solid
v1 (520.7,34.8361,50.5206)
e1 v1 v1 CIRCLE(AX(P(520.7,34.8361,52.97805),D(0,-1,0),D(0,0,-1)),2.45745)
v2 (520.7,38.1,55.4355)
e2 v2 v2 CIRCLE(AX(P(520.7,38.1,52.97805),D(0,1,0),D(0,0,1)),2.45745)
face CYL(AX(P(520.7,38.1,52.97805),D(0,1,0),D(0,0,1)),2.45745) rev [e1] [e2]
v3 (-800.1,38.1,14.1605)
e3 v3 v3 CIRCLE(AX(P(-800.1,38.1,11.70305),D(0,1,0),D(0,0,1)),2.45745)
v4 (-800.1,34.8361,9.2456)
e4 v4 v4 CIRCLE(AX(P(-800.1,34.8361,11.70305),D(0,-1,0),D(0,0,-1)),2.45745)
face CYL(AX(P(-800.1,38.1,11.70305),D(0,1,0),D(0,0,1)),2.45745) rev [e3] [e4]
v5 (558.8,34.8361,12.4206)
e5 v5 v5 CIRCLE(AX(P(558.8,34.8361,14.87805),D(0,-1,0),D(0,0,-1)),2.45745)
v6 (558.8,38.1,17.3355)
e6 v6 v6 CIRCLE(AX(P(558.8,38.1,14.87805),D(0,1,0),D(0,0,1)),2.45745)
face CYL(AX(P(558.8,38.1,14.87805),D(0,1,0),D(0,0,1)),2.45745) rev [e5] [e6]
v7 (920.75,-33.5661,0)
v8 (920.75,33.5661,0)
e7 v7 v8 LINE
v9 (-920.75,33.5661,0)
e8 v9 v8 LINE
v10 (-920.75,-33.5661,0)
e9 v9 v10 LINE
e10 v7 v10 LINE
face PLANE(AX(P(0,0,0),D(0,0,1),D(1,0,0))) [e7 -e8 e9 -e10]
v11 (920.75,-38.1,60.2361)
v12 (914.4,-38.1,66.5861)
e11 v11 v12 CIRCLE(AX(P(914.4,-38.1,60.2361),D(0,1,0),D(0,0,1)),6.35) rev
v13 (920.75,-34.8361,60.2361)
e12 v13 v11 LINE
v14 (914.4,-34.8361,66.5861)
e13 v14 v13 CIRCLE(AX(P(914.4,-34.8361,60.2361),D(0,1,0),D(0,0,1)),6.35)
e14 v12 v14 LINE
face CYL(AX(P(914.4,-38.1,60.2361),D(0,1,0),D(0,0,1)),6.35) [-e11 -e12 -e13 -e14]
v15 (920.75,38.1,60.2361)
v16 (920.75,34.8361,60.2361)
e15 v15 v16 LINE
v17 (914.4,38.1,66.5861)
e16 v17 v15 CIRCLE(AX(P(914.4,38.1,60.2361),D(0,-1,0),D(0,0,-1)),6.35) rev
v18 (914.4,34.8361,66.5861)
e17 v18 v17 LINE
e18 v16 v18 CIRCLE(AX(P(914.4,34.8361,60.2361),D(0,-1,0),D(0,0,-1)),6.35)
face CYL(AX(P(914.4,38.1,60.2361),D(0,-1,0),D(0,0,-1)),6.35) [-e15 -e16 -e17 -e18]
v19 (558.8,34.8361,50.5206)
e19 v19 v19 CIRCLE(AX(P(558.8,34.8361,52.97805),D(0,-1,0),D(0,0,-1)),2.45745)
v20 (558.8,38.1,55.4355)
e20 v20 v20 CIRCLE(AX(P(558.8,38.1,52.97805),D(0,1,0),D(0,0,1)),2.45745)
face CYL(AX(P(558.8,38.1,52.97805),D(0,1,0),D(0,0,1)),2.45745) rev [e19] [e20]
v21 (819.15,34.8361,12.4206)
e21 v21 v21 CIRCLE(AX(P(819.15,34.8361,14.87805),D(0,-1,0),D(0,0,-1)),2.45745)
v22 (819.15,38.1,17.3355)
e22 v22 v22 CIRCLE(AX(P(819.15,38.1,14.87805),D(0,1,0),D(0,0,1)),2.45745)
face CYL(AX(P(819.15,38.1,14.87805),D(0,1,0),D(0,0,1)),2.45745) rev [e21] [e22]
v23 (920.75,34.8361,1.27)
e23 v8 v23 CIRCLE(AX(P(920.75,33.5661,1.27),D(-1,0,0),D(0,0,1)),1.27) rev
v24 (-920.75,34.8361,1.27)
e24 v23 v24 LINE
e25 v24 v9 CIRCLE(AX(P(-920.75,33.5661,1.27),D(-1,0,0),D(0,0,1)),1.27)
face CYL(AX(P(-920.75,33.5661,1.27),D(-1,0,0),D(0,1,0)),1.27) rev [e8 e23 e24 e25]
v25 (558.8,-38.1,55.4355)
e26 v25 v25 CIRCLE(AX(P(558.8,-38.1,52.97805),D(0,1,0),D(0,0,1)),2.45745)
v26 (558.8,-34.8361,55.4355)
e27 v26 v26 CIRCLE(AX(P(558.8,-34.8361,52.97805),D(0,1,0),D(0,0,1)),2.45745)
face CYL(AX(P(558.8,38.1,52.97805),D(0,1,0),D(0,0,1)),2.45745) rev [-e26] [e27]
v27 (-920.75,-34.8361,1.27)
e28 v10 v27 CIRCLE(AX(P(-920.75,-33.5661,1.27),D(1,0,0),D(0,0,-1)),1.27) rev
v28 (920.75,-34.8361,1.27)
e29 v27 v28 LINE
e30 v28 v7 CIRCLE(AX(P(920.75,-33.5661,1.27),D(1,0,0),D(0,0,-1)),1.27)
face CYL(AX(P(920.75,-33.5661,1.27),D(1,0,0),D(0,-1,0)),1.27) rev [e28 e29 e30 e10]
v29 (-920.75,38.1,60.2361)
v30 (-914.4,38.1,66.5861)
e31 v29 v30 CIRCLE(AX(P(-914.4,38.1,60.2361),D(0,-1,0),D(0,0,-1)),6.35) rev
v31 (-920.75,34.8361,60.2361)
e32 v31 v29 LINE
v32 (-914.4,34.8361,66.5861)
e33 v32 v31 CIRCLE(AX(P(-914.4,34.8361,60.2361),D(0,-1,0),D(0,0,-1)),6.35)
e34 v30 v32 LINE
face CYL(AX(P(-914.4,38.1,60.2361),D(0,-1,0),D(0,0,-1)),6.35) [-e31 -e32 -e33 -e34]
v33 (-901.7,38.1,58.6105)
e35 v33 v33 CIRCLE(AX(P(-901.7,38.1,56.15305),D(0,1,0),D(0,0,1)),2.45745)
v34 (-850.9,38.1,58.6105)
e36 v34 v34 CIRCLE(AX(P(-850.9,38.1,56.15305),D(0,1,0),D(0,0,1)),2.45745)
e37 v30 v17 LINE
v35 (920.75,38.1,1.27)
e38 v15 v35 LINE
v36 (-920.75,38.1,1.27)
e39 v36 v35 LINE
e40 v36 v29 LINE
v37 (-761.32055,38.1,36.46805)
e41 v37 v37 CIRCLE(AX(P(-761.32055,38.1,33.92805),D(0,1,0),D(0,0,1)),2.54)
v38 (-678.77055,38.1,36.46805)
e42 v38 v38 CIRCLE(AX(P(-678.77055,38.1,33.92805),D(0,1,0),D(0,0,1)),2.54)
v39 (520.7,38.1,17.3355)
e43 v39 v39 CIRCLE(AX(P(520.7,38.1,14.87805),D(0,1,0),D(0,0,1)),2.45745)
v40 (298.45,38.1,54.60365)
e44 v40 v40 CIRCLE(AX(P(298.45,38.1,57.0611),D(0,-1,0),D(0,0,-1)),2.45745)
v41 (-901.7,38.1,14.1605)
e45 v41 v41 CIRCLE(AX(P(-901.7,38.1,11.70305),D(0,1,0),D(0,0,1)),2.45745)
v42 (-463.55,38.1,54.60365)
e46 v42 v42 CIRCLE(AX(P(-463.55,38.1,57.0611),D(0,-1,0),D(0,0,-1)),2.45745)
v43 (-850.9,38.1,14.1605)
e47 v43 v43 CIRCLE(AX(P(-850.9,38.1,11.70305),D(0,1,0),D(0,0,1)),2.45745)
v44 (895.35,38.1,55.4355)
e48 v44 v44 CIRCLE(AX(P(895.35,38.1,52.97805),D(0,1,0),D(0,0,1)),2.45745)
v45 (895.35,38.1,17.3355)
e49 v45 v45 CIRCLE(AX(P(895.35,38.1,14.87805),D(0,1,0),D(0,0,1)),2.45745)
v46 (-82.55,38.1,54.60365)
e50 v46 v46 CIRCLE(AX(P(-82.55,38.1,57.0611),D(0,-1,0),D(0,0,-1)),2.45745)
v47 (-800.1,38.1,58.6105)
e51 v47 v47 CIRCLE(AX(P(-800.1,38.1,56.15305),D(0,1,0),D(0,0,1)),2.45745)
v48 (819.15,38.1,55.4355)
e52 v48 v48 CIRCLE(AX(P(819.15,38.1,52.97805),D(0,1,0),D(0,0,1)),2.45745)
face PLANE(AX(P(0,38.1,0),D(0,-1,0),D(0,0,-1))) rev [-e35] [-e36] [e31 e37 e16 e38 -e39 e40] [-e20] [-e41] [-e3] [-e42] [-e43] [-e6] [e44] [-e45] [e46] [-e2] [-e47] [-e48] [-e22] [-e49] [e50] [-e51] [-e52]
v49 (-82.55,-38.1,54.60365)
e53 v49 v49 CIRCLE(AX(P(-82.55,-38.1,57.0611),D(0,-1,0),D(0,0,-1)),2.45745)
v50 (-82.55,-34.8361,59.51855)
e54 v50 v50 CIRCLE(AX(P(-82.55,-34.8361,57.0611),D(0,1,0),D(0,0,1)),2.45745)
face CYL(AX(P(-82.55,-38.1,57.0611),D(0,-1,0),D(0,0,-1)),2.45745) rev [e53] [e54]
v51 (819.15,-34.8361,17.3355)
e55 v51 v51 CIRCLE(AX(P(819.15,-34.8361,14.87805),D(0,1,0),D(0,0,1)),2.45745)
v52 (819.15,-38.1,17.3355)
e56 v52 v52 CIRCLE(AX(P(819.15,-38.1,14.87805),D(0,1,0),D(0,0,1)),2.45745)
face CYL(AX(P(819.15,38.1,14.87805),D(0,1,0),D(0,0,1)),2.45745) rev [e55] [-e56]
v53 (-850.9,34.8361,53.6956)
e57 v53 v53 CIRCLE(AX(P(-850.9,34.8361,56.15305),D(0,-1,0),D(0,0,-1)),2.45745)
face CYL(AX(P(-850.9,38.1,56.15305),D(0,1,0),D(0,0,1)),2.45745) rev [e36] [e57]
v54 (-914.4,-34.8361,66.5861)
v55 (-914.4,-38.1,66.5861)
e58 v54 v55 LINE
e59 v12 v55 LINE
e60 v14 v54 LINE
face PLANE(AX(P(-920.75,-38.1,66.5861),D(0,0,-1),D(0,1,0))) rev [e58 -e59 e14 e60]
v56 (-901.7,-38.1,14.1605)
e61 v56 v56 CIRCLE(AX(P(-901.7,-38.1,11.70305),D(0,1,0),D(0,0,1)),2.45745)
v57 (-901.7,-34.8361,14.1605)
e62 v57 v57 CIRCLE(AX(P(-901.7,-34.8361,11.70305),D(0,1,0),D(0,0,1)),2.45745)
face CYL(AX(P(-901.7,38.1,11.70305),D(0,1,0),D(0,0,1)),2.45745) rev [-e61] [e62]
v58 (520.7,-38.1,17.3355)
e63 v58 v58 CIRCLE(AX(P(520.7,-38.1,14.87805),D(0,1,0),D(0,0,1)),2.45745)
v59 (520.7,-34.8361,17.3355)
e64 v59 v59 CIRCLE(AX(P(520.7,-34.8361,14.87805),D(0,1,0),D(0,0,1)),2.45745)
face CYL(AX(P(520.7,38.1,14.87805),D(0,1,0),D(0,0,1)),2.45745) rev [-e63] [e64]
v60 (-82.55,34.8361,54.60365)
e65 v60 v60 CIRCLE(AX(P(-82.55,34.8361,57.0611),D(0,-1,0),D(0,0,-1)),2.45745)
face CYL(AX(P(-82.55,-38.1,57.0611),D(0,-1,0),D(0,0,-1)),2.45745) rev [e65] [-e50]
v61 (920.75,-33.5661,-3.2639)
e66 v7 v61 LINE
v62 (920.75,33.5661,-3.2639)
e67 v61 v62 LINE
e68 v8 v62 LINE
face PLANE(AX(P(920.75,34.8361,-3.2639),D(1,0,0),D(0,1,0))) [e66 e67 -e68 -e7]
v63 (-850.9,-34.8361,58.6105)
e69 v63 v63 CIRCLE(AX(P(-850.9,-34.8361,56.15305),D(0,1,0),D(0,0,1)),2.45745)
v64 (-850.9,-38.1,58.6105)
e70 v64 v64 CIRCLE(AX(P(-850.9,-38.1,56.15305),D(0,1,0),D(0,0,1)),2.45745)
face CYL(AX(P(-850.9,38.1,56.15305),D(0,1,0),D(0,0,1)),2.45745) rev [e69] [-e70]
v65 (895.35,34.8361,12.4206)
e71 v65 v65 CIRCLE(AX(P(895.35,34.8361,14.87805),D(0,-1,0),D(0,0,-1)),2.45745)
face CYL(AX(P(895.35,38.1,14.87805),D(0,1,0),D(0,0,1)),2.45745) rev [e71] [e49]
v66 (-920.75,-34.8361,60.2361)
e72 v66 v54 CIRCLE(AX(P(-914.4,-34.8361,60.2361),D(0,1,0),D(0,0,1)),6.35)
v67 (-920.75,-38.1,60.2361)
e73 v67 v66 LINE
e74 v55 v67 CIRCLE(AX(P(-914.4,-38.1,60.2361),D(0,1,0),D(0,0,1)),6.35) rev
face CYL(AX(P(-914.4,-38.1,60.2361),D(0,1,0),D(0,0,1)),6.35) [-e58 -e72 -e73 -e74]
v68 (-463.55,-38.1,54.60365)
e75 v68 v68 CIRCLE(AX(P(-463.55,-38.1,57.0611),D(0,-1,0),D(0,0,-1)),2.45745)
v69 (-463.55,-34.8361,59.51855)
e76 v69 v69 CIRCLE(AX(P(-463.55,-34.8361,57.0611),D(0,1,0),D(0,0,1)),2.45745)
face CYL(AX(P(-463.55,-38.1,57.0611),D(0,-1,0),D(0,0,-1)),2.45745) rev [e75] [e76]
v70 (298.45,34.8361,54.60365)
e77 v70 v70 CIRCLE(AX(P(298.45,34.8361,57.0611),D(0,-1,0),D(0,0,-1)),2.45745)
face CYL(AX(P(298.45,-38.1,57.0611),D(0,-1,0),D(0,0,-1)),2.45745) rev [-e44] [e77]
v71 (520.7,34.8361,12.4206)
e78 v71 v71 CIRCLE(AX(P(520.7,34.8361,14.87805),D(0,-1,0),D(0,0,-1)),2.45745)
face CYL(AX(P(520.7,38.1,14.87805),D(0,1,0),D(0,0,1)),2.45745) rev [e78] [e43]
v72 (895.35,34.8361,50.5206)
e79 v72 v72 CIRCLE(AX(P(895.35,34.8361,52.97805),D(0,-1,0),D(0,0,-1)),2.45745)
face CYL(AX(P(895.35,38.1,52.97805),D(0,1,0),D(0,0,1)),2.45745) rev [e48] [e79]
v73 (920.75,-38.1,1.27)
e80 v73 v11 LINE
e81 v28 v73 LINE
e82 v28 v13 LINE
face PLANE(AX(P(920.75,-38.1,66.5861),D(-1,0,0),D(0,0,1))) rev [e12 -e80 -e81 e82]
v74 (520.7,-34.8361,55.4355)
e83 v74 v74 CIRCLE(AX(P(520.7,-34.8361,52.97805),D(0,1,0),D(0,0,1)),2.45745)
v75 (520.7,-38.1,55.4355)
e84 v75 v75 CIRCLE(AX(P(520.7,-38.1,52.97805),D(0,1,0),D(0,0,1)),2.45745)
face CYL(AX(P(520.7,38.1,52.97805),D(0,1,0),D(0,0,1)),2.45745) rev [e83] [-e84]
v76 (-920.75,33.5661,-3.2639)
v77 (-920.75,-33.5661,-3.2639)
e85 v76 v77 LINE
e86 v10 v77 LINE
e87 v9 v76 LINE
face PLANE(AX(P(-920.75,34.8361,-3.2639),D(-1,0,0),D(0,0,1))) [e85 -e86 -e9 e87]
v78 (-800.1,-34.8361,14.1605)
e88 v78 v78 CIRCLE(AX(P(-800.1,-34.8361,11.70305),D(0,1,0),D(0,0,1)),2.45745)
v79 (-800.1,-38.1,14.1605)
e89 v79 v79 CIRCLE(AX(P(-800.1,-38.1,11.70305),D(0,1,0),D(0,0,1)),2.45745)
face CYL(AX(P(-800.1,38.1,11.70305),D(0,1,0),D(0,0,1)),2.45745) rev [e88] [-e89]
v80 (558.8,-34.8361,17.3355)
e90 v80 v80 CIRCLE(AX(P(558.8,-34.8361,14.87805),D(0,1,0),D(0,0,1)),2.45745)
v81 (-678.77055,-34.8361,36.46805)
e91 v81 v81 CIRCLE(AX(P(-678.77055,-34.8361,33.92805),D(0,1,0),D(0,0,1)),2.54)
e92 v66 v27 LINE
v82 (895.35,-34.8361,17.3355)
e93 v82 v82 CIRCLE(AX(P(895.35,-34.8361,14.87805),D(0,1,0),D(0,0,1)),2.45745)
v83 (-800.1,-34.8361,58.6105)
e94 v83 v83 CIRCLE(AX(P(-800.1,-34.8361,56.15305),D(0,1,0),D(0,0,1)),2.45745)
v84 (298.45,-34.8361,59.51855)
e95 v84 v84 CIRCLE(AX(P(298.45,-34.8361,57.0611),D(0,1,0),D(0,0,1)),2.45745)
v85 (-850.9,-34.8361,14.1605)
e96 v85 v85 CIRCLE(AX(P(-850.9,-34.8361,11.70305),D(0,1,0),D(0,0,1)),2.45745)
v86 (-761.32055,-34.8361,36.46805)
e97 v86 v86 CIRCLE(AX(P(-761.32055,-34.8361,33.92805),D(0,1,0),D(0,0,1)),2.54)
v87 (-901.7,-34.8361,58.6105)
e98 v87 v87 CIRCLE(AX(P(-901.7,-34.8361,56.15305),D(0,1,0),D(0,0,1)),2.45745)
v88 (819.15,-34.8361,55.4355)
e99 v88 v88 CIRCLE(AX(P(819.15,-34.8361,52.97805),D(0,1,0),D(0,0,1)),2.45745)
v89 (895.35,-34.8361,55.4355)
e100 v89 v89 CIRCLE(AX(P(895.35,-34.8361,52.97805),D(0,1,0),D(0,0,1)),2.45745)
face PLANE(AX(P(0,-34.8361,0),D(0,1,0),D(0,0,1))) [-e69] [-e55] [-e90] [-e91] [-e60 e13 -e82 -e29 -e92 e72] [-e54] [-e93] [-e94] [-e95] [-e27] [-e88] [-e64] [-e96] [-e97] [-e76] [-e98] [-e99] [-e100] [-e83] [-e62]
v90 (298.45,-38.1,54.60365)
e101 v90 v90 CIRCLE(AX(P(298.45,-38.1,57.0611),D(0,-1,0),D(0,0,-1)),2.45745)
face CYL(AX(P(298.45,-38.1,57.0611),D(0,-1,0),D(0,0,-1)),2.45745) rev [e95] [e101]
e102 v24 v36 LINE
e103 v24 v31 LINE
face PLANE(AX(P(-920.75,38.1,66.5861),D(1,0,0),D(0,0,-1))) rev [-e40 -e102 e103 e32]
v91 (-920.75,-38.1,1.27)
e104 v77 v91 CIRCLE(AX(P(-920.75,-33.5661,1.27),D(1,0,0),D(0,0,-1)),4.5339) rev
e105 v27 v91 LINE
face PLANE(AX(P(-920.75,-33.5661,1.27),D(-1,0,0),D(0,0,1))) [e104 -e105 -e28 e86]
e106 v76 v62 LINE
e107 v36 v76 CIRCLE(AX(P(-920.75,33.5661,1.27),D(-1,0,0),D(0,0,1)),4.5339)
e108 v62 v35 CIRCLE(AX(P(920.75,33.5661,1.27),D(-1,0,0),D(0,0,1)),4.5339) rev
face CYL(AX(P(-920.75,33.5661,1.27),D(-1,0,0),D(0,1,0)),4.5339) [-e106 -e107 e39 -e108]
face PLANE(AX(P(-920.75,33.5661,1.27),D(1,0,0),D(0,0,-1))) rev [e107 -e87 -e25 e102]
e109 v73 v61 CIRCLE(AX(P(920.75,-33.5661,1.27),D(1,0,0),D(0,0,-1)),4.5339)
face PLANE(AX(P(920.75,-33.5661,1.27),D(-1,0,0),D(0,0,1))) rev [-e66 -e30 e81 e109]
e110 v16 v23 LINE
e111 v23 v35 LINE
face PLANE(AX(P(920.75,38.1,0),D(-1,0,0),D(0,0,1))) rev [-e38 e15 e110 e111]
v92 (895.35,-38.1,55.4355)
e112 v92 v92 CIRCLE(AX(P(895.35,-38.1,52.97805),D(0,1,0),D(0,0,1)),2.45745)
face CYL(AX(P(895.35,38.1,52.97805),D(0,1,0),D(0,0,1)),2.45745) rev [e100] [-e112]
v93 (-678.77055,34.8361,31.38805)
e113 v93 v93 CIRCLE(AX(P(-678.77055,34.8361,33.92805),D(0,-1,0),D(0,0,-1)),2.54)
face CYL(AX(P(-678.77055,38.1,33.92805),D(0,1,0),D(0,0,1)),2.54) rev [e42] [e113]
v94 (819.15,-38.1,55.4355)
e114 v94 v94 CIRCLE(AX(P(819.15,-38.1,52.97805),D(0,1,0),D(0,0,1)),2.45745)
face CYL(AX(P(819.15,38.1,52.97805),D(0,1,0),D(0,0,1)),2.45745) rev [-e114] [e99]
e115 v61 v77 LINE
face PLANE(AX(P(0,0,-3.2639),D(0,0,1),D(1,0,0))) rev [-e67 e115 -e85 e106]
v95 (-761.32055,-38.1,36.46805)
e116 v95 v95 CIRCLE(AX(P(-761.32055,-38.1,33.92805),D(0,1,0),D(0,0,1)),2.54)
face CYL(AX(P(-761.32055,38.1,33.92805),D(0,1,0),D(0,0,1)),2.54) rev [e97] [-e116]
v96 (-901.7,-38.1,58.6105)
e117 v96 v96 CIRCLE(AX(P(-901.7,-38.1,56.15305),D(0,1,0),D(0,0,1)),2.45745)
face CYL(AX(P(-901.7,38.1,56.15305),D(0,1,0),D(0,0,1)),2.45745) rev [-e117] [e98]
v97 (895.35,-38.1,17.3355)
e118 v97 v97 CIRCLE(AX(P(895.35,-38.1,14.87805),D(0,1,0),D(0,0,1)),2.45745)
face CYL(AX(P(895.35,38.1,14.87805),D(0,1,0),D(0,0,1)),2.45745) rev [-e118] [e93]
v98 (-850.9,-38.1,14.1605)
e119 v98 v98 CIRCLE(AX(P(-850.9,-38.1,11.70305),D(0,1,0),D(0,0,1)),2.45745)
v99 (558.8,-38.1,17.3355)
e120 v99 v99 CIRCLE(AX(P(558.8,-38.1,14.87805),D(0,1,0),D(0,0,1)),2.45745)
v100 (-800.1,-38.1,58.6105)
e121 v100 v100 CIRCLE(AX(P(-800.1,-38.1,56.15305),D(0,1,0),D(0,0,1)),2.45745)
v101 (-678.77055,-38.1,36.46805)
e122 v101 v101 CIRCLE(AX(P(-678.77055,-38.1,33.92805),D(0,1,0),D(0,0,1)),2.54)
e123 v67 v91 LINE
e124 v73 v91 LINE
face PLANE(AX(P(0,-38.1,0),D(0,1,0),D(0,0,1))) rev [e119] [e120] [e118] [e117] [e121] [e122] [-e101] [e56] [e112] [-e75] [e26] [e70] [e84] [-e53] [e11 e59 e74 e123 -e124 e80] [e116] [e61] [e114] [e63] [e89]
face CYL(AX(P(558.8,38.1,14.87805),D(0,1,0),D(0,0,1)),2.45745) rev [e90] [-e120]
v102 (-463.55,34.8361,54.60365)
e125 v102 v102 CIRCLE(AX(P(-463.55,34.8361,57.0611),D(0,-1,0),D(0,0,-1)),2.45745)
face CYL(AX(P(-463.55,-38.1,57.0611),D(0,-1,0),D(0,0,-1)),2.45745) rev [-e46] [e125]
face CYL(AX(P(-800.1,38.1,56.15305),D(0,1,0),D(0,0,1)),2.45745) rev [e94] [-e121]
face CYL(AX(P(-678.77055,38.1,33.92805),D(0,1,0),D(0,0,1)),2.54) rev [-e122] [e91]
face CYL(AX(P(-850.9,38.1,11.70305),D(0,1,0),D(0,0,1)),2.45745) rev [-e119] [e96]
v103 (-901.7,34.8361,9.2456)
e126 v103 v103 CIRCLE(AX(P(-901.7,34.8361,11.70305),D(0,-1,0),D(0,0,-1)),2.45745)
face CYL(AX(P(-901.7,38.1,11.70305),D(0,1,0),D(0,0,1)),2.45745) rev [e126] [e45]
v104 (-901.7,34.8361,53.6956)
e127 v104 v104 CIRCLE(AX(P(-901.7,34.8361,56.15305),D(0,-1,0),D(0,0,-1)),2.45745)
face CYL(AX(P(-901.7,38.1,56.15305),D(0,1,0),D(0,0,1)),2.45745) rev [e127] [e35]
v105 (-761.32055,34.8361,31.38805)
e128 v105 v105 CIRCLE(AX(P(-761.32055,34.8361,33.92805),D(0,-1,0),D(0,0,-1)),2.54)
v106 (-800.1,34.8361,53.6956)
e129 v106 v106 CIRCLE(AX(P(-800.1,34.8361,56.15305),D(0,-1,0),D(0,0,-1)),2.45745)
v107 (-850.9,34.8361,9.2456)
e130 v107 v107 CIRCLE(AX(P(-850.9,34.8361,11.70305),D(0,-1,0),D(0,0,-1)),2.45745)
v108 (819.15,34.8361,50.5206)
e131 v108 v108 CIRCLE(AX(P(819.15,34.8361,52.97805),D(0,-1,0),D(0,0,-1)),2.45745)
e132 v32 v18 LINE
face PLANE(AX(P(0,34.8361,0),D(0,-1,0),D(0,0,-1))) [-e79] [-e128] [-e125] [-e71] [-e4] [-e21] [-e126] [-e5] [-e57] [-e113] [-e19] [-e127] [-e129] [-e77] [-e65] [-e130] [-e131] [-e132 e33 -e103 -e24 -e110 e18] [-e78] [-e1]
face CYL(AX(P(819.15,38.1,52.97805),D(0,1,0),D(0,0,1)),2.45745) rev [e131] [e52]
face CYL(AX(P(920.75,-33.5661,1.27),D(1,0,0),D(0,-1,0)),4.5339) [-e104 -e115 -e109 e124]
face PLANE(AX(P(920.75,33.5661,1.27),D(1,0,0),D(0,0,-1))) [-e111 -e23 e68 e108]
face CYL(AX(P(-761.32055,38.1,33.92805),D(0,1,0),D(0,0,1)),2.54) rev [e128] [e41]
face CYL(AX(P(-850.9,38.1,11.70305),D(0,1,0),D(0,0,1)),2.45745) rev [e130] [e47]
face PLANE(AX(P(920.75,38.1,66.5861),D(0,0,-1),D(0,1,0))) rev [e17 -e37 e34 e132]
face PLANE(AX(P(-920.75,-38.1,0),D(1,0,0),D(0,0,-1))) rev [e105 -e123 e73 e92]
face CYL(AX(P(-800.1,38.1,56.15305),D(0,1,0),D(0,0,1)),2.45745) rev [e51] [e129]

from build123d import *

# Parameters (mm, degrees)
SKETCH2_W                      = 1841.5
SKETCH2_H                      = 69.6722
BASE_FLANGE1_DEPTH             = 3.2639
EDGE_FLANGE1_STRIP_W           = 15.5956
EDGE_FLANGE1_STRIP_H           = 3.2639
EDGE_FLANGE1_STRIP_CUT_DEPTH   = 1841.5
EDGE_FLANGE1_STRIP_2_W         = 15.5956
EDGE_FLANGE1_STRIP_2_H         = 3.2639
EDGE_FLANGE1_STRIP_CUT_2_DEPTH = 1841.5
EDGE_FLANGE1_DEPTH             = 1841.5
EDGE_FLANGE1_BEND_DEPTH        = 1841.5
F_10_0_1935_DIAMETER_HOLE1_D   = 4.9149
F_10_0_1935_DIAMETER_HOLE3_D   = 4.9149
F_10_0_1935_DIAMETER_HOLE4_D   = 4.9149
F_10_0_2_DIAMETER_HOLE1_D      = 5.08
F_10_0_1935_DIAMETER_HOLE6_D   = 4.9149
LPATTERN2_COUNT                = 3
LPATTERN2_PITCH                = 381
FILLET2_R                      = 6.35


# Sheet-metal steps are written as plain solids
with BuildPart() as part:
    # Sketch2 → Base-Flange1 (new body)
    with BuildSketch(Plane.XY):
        Rectangle(SKETCH2_W, SKETCH2_H)
    extrude(amount=-BASE_FLANGE1_DEPTH)

    # Edge-Flange1 strip (across the edge) → Edge-Flange1 strip cut (cut)
    with BuildSketch(Plane(origin=(920.75, 34.8361, 0), x_dir=(0, -1, 0), z_dir=(-1, 0, 0))):
        with Locations((-6.5278, -1.63195)):
            Rectangle(EDGE_FLANGE1_STRIP_W, EDGE_FLANGE1_STRIP_H)
    extrude(amount=EDGE_FLANGE1_STRIP_CUT_DEPTH, mode=Mode.SUBTRACT)

    # Edge-Flange1 strip 2 (across the edge) → Edge-Flange1 strip cut 2 (cut)
    with BuildSketch(Plane(origin=(-920.75, -34.8361, 0), x_dir=(0, 1, 0), z_dir=(1, 0, 0))):
        with Locations((-6.5278, -1.63195)):
            Rectangle(EDGE_FLANGE1_STRIP_2_W, EDGE_FLANGE1_STRIP_2_H)
    extrude(amount=EDGE_FLANGE1_STRIP_CUT_2_DEPTH, mode=Mode.SUBTRACT)

    # Edge-Flange1 section (across the edge) → Edge-Flange1 (add)
    with BuildSketch(Plane(origin=(920.75, 34.8361, 0), x_dir=(0, -1, 0), z_dir=(-1, 0, 0))):
        with BuildLine():
            Line((-3.2639, 1.27), (-3.2639, 66.5861))
            Line((-3.2639, 66.5861), (0, 66.5861))
            Line((0, 66.5861), (0, 1.27))
            ThreePointArc((0, 1.27), (0.371974388, 0.371974388), (1.27, 0))
            Line((1.27, 0), (1.27, -3.2639))
            ThreePointArc((1.27, -3.2639), (-1.935951435, -1.935951435), (-3.2639, 1.27))
        make_face()
    extrude(amount=EDGE_FLANGE1_DEPTH)

    # Edge-Flange1 section 2 (across the edge) → Edge-Flange1 bend (add)
    with BuildSketch(Plane(origin=(-920.75, -34.8361, 0), x_dir=(0, 1, 0), z_dir=(1, 0, 0))):
        with BuildLine():
            Line((-3.2639, 1.27), (-3.2639, 66.5861))
            Line((-3.2639, 66.5861), (0, 66.5861))
            Line((0, 66.5861), (0, 1.27))
            ThreePointArc((0, 1.27), (0.371974388, 0.371974388), (1.27, 0))
            Line((1.27, 0), (1.27, -3.2639))
            ThreePointArc((1.27, -3.2639), (-1.935951435, -1.935951435), (-3.2639, 1.27))
        make_face()
    extrude(amount=EDGE_FLANGE1_BEND_DEPTH)

    # #10 (0.1935) Diameter Hole1 (through all)
    with Locations(Plane(origin=(0, 38.1, 34.8361), x_dir=(-1, 0, 0), z_dir=(0, 1, 0))):
        with Locations((800.1, -23.13305), (800.1, 21.31695), (850.9, 21.31695), (850.9, -23.13305), (901.7, 21.31695), (901.7, -23.13305)):
            Hole(F_10_0_1935_DIAMETER_HOLE1_D / 2)

    # #10 (0.1935) Diameter Hole3 (through all)
    with Locations(Plane(origin=(0, 38.1, 0), x_dir=(1, 0, 0), z_dir=(0, 1, 0))):
        with Locations((819.15, -14.87805), (819.15, -52.97805), (895.35, -14.87805), (895.35, -52.97805)):
            Hole(F_10_0_1935_DIAMETER_HOLE3_D / 2)

    # #10 (0.1935) Diameter Hole4 (through all)
    with Locations(Plane(origin=(0, 38.1, 0), x_dir=(1, 0, 0), z_dir=(0, 1, 0))):
        with Locations((520.7, -14.87805), (558.8, -14.87805), (558.8, -52.97805), (520.7, -52.97805)):
            Hole(F_10_0_1935_DIAMETER_HOLE4_D / 2)

    # #10 (0.2) Diameter Hole1 (through all)
    with Locations(Plane(origin=(0, 38.1, 0), x_dir=(1, 0, 0), z_dir=(0, 1, 0))):
        with Locations((-761.32055, -33.92805), (-678.77055, -33.92805)):
            Hole(F_10_0_2_DIAMETER_HOLE1_D / 2)

    # #10 (0.1935) Diameter Hole6 (through all)
    with Locations(Plane(origin=(0, -38.1, 0), x_dir=(-1, 0, 0), z_dir=(0, -1, 0))):
        with Locations((463.55, -57.0611)):
            f_10_0_1935_diameter_hole6 = Hole(F_10_0_1935_DIAMETER_HOLE6_D / 2)

    # LPattern2: #10 (0.1935) Diameter Hole6 ×3
    with Locations(*[(i * LPATTERN2_PITCH, 0, 0) for i in range(1, LPATTERN2_COUNT)]):
        add(f_10_0_1935_diameter_hole6, mode=Mode.SUBTRACT)

    # Fillet2
    fillet2_edges = [part.edges().sort_by_distance(p)[0] for p in [
        (920.75, 36.46805, 66.5861),
        (-920.75, 36.46805, 66.5861),
        (-920.75, -36.46805, 66.5861),
        (920.75, -36.46805, 66.5861),
    ]]
    fillet(fillet2_edges, radius=FILLET2_R)


solid = part.part
